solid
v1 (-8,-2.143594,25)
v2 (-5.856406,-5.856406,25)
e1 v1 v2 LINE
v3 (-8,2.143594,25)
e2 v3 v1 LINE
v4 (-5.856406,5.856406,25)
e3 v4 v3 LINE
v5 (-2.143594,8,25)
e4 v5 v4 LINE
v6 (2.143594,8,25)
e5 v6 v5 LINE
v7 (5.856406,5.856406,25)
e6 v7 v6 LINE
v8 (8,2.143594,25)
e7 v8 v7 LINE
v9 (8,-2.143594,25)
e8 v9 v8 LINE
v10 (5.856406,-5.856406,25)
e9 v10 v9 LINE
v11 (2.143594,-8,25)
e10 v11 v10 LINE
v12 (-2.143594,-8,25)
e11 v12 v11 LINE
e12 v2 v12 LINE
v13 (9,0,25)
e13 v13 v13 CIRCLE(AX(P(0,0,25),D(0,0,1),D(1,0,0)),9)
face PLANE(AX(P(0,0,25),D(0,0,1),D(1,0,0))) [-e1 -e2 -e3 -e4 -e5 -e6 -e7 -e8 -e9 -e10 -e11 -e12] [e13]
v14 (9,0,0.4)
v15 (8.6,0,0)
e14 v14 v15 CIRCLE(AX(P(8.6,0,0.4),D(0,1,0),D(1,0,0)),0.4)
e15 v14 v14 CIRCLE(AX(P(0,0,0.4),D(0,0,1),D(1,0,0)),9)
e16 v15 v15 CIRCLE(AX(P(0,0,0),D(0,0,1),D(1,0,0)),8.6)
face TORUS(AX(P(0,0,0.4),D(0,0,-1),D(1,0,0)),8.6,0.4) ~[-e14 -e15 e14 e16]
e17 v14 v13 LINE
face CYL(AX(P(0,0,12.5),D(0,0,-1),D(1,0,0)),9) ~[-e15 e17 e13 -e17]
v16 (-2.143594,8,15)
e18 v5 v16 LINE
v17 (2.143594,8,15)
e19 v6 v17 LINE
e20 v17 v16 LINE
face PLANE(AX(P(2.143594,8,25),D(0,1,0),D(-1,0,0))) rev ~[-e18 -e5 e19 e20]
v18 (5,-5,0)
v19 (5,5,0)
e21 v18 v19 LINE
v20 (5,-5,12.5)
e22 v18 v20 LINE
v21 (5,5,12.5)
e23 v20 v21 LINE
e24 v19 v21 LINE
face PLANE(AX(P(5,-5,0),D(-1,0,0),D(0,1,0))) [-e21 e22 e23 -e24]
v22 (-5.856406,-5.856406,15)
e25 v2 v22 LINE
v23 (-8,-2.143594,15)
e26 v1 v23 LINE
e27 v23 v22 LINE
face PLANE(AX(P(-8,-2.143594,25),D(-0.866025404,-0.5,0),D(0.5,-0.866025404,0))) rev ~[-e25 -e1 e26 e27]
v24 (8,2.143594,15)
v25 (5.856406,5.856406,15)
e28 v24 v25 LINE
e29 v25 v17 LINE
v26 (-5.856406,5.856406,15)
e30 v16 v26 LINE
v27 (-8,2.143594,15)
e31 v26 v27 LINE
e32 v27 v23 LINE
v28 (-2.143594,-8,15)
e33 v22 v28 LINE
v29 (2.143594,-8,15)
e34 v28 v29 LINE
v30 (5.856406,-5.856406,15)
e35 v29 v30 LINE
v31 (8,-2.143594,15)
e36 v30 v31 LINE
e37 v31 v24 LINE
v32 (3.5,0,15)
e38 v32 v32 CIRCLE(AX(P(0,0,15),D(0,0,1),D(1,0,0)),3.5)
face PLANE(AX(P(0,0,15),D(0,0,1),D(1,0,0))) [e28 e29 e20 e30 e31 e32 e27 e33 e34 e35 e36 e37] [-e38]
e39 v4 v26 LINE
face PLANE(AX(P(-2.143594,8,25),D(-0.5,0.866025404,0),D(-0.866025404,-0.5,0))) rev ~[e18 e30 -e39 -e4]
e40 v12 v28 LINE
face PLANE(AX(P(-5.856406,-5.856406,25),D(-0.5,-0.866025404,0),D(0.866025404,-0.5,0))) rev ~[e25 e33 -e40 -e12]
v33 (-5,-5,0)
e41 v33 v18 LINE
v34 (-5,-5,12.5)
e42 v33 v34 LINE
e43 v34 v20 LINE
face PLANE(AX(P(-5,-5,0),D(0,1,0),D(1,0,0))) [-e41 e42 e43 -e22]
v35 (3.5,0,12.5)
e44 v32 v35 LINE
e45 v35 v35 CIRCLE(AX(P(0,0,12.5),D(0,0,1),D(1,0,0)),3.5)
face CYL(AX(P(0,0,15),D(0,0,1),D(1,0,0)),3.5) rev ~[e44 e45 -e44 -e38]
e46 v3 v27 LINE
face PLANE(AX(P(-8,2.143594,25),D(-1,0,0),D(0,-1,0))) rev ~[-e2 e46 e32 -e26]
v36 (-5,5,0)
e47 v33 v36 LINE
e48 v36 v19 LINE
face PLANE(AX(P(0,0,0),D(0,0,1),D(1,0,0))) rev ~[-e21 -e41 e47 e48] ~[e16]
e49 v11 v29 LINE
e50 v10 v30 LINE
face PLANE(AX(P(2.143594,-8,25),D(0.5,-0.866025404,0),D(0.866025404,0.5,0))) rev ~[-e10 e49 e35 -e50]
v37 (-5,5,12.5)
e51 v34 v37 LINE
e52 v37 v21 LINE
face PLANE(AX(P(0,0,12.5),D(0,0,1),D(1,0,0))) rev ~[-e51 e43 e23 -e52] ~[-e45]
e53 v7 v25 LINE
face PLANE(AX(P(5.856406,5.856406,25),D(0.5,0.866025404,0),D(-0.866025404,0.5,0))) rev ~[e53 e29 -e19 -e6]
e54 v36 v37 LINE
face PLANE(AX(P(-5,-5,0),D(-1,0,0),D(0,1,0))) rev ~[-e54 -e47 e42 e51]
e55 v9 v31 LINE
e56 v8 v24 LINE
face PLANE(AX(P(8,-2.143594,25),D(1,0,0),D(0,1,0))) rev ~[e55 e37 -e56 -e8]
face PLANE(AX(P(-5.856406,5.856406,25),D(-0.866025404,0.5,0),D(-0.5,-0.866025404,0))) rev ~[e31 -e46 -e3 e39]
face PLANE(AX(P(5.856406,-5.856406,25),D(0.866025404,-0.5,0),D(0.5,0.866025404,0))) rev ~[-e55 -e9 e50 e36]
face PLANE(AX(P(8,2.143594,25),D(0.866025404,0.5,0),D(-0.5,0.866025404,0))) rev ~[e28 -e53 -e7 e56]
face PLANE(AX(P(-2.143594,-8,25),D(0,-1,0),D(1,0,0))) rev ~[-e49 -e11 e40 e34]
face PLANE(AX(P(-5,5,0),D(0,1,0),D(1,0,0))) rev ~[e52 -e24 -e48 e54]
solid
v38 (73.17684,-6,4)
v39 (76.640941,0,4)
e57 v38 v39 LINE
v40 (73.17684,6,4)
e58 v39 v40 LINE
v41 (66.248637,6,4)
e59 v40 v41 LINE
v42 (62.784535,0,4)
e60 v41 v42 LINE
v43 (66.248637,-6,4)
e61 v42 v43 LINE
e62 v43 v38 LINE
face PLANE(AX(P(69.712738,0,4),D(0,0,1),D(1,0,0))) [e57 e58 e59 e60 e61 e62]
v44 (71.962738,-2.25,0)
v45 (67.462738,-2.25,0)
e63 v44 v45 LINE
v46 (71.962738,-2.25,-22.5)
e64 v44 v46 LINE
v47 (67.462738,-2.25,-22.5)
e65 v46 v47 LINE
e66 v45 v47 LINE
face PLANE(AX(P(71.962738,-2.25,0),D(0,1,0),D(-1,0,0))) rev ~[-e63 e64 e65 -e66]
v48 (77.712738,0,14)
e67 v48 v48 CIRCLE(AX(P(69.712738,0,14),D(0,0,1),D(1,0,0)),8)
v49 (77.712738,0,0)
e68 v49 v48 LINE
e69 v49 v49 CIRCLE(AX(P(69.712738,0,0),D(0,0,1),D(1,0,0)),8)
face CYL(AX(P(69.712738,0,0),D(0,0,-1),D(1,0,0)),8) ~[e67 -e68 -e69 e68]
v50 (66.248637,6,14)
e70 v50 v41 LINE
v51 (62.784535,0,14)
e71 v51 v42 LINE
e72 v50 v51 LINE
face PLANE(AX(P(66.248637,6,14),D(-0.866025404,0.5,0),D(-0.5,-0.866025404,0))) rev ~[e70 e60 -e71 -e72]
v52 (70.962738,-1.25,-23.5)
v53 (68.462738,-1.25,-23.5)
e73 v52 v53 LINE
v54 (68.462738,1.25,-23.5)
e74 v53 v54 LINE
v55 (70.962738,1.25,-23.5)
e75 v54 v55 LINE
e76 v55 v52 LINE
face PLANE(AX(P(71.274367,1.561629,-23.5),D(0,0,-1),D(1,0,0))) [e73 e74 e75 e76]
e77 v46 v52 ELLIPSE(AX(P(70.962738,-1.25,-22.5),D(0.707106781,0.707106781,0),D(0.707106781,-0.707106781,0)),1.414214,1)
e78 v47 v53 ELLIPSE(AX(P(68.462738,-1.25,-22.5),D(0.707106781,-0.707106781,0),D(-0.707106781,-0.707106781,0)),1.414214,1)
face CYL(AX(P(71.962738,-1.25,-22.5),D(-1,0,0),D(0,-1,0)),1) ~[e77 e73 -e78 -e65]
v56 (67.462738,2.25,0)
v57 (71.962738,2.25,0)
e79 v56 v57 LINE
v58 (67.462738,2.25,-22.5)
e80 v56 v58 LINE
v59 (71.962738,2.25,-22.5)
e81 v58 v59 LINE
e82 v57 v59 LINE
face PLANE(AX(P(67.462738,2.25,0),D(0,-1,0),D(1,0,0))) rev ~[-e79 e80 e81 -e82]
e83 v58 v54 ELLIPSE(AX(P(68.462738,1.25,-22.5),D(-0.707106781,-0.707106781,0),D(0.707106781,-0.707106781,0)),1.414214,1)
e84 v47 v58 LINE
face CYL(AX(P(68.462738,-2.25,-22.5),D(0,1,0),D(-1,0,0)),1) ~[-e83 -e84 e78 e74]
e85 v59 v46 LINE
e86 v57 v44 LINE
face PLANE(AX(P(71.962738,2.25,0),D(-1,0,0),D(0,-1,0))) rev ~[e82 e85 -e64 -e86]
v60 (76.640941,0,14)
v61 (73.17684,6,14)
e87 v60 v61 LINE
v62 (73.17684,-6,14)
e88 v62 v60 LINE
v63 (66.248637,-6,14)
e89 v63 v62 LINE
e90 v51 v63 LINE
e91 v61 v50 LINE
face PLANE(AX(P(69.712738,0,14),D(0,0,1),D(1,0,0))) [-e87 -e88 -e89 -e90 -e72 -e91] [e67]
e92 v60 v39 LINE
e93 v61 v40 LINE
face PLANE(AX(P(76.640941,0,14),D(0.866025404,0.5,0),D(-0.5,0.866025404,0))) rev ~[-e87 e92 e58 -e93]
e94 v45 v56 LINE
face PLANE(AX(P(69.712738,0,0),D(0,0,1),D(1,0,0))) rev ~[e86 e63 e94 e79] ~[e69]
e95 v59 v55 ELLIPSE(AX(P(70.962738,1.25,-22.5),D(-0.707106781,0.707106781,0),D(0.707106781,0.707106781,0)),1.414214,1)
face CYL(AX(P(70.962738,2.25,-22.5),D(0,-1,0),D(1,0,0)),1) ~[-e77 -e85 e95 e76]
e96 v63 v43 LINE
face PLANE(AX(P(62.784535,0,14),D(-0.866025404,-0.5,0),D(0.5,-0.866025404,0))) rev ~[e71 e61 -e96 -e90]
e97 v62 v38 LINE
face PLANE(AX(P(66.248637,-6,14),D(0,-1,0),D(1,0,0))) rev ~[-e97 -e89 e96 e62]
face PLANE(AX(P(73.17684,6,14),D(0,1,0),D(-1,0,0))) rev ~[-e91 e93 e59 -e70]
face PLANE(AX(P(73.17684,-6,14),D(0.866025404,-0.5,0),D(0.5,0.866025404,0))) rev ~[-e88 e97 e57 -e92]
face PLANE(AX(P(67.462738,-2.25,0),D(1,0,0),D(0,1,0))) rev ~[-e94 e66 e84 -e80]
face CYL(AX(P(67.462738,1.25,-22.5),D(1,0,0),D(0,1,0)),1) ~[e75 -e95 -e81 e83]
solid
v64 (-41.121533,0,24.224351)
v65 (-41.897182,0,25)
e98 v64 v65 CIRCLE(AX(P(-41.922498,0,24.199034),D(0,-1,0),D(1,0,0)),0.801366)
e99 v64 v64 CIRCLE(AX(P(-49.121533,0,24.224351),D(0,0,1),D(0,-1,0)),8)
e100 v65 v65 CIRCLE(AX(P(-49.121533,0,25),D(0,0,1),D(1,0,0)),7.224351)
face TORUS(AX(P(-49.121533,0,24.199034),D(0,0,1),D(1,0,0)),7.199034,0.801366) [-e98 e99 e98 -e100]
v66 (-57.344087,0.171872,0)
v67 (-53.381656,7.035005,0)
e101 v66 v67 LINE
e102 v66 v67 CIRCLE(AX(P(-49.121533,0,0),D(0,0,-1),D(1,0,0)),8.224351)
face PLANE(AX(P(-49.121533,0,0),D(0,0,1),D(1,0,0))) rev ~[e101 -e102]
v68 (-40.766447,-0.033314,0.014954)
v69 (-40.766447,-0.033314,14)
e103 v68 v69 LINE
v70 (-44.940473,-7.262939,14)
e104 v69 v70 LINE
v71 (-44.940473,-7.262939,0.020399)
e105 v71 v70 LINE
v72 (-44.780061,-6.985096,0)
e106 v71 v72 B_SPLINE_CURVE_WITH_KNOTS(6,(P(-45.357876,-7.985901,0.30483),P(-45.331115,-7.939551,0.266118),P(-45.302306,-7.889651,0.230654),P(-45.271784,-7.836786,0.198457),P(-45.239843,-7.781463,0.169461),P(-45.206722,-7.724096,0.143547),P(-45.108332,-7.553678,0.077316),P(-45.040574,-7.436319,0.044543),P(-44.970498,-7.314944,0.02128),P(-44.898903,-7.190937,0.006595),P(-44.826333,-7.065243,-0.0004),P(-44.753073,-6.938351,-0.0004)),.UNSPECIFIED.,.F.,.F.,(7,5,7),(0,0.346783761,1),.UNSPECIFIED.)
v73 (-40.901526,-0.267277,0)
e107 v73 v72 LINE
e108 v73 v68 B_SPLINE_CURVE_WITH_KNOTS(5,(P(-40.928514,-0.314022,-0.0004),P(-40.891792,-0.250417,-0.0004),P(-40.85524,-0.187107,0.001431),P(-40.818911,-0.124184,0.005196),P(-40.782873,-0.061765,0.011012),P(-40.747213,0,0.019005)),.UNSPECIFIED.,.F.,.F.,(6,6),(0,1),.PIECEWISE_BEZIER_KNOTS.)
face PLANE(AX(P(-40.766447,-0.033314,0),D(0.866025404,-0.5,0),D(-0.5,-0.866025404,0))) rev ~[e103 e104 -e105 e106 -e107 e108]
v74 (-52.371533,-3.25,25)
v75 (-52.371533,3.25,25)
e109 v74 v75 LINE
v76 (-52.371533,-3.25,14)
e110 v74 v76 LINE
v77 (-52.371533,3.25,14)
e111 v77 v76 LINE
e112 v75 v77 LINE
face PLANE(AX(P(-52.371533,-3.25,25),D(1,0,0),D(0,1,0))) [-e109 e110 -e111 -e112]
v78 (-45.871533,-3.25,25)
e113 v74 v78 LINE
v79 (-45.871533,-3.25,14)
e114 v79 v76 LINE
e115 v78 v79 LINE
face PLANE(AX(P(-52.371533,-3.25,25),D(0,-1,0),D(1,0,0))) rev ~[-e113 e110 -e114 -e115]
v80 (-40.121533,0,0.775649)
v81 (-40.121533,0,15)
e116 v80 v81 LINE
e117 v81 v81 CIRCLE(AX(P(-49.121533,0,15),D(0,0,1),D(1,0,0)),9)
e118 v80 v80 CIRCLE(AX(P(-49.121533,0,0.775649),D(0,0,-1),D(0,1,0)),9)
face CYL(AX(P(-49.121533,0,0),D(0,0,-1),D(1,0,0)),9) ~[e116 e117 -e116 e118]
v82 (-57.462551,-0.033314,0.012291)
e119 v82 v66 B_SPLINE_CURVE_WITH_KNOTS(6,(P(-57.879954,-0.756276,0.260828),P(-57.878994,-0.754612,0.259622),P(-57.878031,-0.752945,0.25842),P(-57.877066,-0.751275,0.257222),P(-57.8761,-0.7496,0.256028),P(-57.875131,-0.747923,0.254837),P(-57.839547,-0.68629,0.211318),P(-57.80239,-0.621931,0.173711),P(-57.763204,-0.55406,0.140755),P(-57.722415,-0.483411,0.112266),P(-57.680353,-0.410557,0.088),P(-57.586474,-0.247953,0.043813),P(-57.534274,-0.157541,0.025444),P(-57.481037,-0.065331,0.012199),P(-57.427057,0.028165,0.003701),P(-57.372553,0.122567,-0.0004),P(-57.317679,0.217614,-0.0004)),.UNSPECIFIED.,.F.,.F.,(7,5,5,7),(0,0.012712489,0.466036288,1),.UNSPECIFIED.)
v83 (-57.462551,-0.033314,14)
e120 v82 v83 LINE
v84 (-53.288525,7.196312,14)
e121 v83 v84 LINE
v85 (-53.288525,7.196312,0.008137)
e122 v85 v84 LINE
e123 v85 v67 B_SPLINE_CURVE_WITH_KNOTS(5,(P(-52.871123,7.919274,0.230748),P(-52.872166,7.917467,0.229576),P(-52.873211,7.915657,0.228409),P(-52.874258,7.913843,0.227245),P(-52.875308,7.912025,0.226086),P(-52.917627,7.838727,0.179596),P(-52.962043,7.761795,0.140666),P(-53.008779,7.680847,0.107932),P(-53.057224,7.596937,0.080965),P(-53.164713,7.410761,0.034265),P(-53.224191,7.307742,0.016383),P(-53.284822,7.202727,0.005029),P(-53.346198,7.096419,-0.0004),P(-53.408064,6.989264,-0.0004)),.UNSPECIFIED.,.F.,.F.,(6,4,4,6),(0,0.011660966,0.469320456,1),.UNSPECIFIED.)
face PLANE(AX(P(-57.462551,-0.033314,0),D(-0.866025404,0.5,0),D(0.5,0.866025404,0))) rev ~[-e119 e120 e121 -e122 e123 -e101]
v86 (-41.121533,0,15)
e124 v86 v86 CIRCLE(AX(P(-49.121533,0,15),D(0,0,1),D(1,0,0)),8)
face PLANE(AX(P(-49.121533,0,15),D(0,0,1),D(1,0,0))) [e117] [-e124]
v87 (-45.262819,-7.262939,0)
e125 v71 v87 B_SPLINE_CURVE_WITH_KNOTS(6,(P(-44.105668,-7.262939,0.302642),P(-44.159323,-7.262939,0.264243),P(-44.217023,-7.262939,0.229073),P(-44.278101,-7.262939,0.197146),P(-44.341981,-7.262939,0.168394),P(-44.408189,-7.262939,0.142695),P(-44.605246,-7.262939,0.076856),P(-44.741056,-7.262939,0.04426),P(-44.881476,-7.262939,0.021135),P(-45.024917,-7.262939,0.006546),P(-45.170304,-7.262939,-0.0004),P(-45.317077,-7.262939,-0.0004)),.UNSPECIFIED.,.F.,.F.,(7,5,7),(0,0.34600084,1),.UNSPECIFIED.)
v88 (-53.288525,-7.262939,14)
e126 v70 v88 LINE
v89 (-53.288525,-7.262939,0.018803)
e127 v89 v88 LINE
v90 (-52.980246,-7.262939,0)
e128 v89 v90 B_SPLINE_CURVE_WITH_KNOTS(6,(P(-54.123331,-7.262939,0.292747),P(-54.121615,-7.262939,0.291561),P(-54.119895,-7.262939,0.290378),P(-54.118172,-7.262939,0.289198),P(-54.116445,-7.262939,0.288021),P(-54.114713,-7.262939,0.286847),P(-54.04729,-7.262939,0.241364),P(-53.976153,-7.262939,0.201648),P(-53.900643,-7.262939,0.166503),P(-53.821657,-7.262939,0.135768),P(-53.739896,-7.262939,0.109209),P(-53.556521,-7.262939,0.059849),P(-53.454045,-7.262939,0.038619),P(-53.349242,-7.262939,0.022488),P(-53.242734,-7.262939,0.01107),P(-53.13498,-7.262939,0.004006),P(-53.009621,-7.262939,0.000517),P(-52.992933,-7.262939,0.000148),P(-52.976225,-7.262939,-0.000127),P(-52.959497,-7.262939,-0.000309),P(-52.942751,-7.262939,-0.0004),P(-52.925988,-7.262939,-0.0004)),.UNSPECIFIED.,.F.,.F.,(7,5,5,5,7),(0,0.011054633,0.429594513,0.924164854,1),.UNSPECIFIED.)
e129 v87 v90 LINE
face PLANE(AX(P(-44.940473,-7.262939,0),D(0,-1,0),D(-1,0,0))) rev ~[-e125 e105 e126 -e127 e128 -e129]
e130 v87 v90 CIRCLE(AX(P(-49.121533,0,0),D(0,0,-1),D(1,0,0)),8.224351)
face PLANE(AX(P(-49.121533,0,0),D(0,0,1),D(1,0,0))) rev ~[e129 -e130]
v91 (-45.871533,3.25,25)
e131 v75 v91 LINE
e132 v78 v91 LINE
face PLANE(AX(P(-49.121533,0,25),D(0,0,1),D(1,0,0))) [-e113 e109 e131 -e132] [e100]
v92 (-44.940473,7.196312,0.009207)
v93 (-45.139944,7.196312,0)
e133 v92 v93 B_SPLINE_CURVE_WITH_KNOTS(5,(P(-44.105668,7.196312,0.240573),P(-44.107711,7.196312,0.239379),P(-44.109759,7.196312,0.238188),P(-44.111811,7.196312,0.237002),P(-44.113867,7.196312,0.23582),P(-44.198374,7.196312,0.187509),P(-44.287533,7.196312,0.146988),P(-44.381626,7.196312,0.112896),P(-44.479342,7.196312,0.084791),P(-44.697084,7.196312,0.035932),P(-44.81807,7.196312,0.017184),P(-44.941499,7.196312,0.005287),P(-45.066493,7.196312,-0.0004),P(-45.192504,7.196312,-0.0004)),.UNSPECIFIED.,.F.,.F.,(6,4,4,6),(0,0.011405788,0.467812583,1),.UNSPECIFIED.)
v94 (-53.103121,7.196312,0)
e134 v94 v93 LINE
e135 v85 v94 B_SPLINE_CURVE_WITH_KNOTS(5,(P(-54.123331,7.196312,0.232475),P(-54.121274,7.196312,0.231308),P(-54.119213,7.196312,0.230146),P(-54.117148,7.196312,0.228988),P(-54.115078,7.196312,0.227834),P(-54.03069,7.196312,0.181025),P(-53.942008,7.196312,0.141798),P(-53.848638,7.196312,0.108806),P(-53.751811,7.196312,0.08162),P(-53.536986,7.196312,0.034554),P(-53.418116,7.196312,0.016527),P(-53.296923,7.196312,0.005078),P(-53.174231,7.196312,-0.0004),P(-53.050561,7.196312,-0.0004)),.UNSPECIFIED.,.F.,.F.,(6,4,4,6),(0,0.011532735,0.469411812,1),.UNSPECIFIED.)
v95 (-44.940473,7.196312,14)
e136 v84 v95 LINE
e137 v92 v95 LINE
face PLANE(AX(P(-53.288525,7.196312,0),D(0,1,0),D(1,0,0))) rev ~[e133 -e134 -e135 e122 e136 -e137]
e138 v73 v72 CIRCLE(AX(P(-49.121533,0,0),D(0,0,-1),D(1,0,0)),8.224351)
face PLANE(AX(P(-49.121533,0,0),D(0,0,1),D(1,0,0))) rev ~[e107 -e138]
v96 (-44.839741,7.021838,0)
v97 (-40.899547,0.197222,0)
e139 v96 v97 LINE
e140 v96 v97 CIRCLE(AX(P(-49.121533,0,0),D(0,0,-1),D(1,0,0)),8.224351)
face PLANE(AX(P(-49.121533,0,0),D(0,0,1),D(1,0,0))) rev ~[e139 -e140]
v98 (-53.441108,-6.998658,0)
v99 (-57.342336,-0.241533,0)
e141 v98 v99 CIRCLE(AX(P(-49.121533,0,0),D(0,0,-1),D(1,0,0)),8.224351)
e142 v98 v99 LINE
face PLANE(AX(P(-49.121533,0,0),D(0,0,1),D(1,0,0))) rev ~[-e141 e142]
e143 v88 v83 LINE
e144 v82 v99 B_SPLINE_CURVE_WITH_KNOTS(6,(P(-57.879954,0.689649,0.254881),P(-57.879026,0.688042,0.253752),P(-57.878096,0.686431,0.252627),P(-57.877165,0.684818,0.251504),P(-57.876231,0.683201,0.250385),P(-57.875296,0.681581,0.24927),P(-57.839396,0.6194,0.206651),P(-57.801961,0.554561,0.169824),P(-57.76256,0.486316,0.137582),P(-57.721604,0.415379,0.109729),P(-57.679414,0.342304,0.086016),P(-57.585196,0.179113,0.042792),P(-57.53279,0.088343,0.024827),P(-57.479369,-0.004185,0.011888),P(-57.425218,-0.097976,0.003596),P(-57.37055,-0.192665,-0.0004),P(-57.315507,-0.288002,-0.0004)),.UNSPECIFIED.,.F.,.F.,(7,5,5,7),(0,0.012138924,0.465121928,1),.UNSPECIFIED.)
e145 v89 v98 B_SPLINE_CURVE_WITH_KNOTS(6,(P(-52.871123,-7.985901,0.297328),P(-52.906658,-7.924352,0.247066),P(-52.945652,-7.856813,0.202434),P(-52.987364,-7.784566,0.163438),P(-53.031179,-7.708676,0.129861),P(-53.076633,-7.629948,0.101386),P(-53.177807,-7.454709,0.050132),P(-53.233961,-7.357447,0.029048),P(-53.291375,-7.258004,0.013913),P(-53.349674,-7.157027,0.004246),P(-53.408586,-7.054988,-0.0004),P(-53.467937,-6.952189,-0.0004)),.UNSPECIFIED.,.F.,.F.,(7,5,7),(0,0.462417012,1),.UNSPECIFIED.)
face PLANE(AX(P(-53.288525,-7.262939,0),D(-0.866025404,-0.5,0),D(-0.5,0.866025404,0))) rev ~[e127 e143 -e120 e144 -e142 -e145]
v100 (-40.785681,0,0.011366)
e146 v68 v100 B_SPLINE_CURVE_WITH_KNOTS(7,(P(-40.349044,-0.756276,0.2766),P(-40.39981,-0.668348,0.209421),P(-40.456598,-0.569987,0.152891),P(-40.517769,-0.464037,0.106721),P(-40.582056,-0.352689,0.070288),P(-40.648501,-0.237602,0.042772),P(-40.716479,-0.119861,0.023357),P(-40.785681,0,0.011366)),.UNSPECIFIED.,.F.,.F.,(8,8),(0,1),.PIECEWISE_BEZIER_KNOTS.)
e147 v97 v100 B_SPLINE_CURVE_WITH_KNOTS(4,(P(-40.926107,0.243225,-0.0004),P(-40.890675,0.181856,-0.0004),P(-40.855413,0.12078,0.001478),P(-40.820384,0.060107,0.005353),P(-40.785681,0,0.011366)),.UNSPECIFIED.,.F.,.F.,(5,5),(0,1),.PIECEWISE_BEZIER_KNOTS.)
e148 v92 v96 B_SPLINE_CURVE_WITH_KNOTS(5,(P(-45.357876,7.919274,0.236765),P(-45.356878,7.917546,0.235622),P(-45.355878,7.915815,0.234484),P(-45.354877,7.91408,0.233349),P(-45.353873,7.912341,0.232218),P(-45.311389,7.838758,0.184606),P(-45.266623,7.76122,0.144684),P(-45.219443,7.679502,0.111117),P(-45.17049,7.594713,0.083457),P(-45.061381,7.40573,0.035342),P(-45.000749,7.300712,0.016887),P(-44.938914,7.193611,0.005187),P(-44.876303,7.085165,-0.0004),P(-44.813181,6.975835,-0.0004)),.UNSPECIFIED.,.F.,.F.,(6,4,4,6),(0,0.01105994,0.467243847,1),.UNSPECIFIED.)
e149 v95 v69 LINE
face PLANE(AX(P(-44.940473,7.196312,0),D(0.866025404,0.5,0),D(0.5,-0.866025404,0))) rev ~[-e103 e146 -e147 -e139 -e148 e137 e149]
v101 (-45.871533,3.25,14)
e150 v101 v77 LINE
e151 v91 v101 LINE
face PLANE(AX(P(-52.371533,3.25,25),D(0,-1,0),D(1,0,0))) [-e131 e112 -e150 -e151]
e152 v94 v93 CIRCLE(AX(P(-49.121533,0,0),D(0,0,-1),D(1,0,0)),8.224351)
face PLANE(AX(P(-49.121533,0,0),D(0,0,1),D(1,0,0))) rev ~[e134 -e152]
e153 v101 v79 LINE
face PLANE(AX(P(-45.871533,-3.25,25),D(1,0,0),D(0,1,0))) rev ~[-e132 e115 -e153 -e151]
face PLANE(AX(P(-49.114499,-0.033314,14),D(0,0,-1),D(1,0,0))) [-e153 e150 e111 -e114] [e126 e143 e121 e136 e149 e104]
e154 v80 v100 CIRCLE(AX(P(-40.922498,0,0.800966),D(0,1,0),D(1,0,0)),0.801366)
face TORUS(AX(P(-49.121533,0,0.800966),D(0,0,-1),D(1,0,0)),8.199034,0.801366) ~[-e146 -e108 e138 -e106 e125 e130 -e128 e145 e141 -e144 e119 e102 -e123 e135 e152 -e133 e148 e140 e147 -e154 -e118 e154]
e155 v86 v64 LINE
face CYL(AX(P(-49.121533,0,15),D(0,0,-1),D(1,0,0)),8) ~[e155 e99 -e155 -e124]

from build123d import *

# Parameters (mm, degrees)
F0_R      = 9
F0_W      = 10
F0_H      = 10
F1_DEPTH  = 12.5
F2_R      = 0.4
F3_R      = 9
F4_DEPTH  = 12.5
F6_DEPTH  = 10
F7_R      = 8
F8_DEPTH  = 14
F10_DEPTH = 23.5
F11_R     = 3.5
F12_DEPTH = 12
F13_R     = 1
F14_R     = 9
F15_DEPTH = 15
F16_R     = 8
F17_DEPTH = 10
F19_DEPTH = 14
F20_W     = 6.5
F20_H     = 6.5
F21_DEPTH = 25
F24_DEPTH = 10


# Not quite as in the source:
# - a fillet or chamfer that OpenCascade refuses, or shapes differently, is made with other operations: its cross-section is extruded or revolved along the edge and cut away or added
# - a feature names something its author has since deleted; it is built from what else it names


with BuildPart() as f1:
    # F0 (on Top) → F1 (new body)
    with BuildSketch(Plane.XY):
        Circle(F0_R)
        Rectangle(F0_W, F0_H, mode=Mode.SUBTRACT)
    extrude(amount=F1_DEPTH)

    # F2
    f2_edges = [f1.edges().sort_by_distance(p)[0] for p in [
        (-9, 0, 0),
    ]]
    fillet(f2_edges, radius=F2_R)

    # F3 (on face) → F4 (join)
    with BuildSketch(Plane.XY.offset(12.5)):
        Circle(F3_R)
    extrude(amount=F4_DEPTH)

    # F5 (on face) → F6 (cut)
    with BuildSketch(Plane.XY.offset(25)):
        Polygon((2.1435935394, 8), (-2.1435935394, 8), (-5.8564064606, 5.8564064606), (-8, 2.1435935394), (-8, -2.1435935394), (-5.8564064606, -5.8564064606), (-2.1435935394, -8), (2.1435935394, -8), (5.8564064606, -5.8564064606), (8, -2.1435935394), (8, 2.1435935394), (5.8564064606, 5.8564064606), align=None)
    extrude(amount=-F6_DEPTH, mode=Mode.SUBTRACT)

    # F11 (on face) → F12 (cut)
    with BuildSketch(Plane.XY.offset(15)):
        Circle(F11_R)
    extrude(amount=-F12_DEPTH, mode=Mode.SUBTRACT)


with BuildPart() as f8:
    # F7 (on Top) → F8 (new body)
    with BuildSketch(Plane.XY):
        with Locations((69.7127382428, 0)):
            Circle(F7_R)
    extrude(amount=F8_DEPTH)

    # F9 (on face) → F10 (join)
    with BuildSketch(Plane(origin=(0, 0, 0), x_dir=(1, 0, 0), z_dir=(0, 0, -1))):
        with BuildLine():
            Line((71.9627382428, -2.25), (71.9627382428, 0))
            ThreePointArc((71.9627382428, 0), (71.3037285004, -1.5909902577), (69.7127382428, -2.25))
            Line((69.7127382428, -2.25), (71.9627382428, -2.25))
        make_face()
        with BuildLine():
            ThreePointArc((69.7127382428, 2.25), (71.3037285004, 1.5909902577), (71.9627382428, 0))
            Line((71.9627382428, 0), (71.9627382428, 2.25))
            Line((71.9627382428, 2.25), (69.7127382428, 2.25))
        make_face()
        with BuildLine():
            Line((67.4627382428, -2.25), (69.7127382428, -2.25))
            ThreePointArc((69.7127382428, -2.25), (68.1217479851, -1.5909902577), (67.4627382428, 0))
            Line((67.4627382428, 0), (67.4627382428, -2.25))
        make_face()
        with BuildLine():
            ThreePointArc((69.7127382428, -2.25), (71.3037285004, -1.5909902577), (71.9627382428, 0))
            ThreePointArc((71.9627382428, 0), (71.3037285004, 1.5909902577), (69.7127382428, 2.25))
            ThreePointArc((69.7127382428, 2.25), (68.1217479851, 1.5909902577), (67.4627382428, 0))
            ThreePointArc((67.4627382428, 0), (68.1217479851, -1.5909902577), (69.7127382428, -2.25))
        make_face()
        with BuildLine():
            ThreePointArc((67.4627382428, 0), (68.1217479851, 1.5909902577), (69.7127382428, 2.25))
            Line((69.7127382428, 2.25), (67.4627382428, 2.25))
            Line((67.4627382428, 2.25), (67.4627382428, 0))
        make_face()
    extrude(amount=F10_DEPTH)

    # F13
    f13_edges = [f8.edges().sort_by_distance(p)[0] for p in [
        (69.712738, 2.25, -23.5),
        (71.962738, 0, -23.5),
        (69.712738, -2.25, -23.5),
        (67.462738, 0, -23.5),
    ]]
    fillet(f13_edges, radius=F13_R)

    # F23 (on face) → F24 (cut)
    with BuildSketch(Plane.XY.offset(14)):
        Polygon((73.1768398579, 6), (66.2486366276, 6), (62.7845350125, 0), (66.2486366276, -6), (73.1768398579, -6), (76.640941473, 0), align=None)
    extrude(amount=-F24_DEPTH, mode=Mode.SUBTRACT)


with BuildPart() as f15:
    # F14 (on Top) → F15 (new body)
    with BuildSketch(Plane.XY):
        with Locations((-49.1215325892, 0)):
            Circle(F14_R)
    extrude(amount=F15_DEPTH)

    # F16 (on face) → F17 (join)
    with BuildSketch(Plane.XY.offset(15)):
        with Locations((-49.1215325892, 0)):
            Circle(F16_R)
    extrude(amount=F17_DEPTH)

    # F18 (on face) → F19 (cut)
    with BuildSketch(Plane(origin=(0, 0, 0), x_dir=(1, 0, 0), z_dir=(0, 0, -1))):
        Polygon((-44.9404731584, 7.2629388451), (-53.2885253239, 7.2629388451), (-57.4625514066, 0.0333135977), (-53.2885253239, -7.1963116497), (-44.9404731584, -7.1963116497), (-40.7664470756, 0.0333135977), align=None)
    extrude(amount=-F19_DEPTH, mode=Mode.SUBTRACT)

    # F20 (on face) → F21 (cut)
    with BuildSketch(Plane.XY.offset(25)):
        with Locations((-49.1215325892, 0)):
            Rectangle(F20_W, F20_H)
    extrude(amount=-F21_DEPTH, mode=Mode.SUBTRACT)

    # F22: fillet of radius 0.8 on 2 edges, made by hand

    # F22_s1 → F22_t2 (revolve, cut)
    with BuildSketch(Plane.XZ):
        with BuildLine():
            ThreePointArc((-41.1211325892, 24.1990343146), (-41.3558471642, 24.7656854249), (-41.9224982746, 25.0004))
            Line((-41.9224982746, 25.0004), (-41.9224982746, 25.0805365685))
            ThreePointArc((-41.9224982746, 25.0805365685), (-41.5220154319, 25.0801365685), (-41.1215325892, 25.0801365685))
            Line((-41.1215325892, 25.0801365685), (-41.0413960207, 25))
            ThreePointArc((-41.0413960207, 25), (-41.0413960207, 24.5995171573), (-41.0409960207, 24.1990343146))
            Line((-41.0409960207, 24.1990343146), (-41.1211325892, 24.1990343146))
        make_face()
    revolve(axis=Axis((-49.1215325892, 0, 25), (0, 0, 1)), mode=Mode.SUBTRACT)

    # F22_s3 → F22_t4 (revolve, cut)
    with BuildSketch(Plane.XZ):
        with BuildLine():
            ThreePointArc((-40.1211325892, 0.8009656854), (-40.3558471642, 0.2343145751), (-40.9224982746, -0.0004))
            Line((-40.9224982746, -0.0004), (-40.9224982746, -0.0805365685))
            ThreePointArc((-40.9224982746, -0.0805365685), (-40.5220154319, -0.0801365685), (-40.1215325892, -0.0801365685))
            Line((-40.1215325892, -0.0801365685), (-40.0413960207, 0))
            ThreePointArc((-40.0413960207, 0), (-40.0413960207, 0.4004828427), (-40.0409960207, 0.8009656854))
            Line((-40.0409960207, 0.8009656854), (-40.1211325892, 0.8009656854))
        make_face()
    revolve(axis=Axis((-49.1215325892, 0, 0), (0, 0, 1)), mode=Mode.SUBTRACT)


solid = Compound([f1.part, f8.part, f15.part])
